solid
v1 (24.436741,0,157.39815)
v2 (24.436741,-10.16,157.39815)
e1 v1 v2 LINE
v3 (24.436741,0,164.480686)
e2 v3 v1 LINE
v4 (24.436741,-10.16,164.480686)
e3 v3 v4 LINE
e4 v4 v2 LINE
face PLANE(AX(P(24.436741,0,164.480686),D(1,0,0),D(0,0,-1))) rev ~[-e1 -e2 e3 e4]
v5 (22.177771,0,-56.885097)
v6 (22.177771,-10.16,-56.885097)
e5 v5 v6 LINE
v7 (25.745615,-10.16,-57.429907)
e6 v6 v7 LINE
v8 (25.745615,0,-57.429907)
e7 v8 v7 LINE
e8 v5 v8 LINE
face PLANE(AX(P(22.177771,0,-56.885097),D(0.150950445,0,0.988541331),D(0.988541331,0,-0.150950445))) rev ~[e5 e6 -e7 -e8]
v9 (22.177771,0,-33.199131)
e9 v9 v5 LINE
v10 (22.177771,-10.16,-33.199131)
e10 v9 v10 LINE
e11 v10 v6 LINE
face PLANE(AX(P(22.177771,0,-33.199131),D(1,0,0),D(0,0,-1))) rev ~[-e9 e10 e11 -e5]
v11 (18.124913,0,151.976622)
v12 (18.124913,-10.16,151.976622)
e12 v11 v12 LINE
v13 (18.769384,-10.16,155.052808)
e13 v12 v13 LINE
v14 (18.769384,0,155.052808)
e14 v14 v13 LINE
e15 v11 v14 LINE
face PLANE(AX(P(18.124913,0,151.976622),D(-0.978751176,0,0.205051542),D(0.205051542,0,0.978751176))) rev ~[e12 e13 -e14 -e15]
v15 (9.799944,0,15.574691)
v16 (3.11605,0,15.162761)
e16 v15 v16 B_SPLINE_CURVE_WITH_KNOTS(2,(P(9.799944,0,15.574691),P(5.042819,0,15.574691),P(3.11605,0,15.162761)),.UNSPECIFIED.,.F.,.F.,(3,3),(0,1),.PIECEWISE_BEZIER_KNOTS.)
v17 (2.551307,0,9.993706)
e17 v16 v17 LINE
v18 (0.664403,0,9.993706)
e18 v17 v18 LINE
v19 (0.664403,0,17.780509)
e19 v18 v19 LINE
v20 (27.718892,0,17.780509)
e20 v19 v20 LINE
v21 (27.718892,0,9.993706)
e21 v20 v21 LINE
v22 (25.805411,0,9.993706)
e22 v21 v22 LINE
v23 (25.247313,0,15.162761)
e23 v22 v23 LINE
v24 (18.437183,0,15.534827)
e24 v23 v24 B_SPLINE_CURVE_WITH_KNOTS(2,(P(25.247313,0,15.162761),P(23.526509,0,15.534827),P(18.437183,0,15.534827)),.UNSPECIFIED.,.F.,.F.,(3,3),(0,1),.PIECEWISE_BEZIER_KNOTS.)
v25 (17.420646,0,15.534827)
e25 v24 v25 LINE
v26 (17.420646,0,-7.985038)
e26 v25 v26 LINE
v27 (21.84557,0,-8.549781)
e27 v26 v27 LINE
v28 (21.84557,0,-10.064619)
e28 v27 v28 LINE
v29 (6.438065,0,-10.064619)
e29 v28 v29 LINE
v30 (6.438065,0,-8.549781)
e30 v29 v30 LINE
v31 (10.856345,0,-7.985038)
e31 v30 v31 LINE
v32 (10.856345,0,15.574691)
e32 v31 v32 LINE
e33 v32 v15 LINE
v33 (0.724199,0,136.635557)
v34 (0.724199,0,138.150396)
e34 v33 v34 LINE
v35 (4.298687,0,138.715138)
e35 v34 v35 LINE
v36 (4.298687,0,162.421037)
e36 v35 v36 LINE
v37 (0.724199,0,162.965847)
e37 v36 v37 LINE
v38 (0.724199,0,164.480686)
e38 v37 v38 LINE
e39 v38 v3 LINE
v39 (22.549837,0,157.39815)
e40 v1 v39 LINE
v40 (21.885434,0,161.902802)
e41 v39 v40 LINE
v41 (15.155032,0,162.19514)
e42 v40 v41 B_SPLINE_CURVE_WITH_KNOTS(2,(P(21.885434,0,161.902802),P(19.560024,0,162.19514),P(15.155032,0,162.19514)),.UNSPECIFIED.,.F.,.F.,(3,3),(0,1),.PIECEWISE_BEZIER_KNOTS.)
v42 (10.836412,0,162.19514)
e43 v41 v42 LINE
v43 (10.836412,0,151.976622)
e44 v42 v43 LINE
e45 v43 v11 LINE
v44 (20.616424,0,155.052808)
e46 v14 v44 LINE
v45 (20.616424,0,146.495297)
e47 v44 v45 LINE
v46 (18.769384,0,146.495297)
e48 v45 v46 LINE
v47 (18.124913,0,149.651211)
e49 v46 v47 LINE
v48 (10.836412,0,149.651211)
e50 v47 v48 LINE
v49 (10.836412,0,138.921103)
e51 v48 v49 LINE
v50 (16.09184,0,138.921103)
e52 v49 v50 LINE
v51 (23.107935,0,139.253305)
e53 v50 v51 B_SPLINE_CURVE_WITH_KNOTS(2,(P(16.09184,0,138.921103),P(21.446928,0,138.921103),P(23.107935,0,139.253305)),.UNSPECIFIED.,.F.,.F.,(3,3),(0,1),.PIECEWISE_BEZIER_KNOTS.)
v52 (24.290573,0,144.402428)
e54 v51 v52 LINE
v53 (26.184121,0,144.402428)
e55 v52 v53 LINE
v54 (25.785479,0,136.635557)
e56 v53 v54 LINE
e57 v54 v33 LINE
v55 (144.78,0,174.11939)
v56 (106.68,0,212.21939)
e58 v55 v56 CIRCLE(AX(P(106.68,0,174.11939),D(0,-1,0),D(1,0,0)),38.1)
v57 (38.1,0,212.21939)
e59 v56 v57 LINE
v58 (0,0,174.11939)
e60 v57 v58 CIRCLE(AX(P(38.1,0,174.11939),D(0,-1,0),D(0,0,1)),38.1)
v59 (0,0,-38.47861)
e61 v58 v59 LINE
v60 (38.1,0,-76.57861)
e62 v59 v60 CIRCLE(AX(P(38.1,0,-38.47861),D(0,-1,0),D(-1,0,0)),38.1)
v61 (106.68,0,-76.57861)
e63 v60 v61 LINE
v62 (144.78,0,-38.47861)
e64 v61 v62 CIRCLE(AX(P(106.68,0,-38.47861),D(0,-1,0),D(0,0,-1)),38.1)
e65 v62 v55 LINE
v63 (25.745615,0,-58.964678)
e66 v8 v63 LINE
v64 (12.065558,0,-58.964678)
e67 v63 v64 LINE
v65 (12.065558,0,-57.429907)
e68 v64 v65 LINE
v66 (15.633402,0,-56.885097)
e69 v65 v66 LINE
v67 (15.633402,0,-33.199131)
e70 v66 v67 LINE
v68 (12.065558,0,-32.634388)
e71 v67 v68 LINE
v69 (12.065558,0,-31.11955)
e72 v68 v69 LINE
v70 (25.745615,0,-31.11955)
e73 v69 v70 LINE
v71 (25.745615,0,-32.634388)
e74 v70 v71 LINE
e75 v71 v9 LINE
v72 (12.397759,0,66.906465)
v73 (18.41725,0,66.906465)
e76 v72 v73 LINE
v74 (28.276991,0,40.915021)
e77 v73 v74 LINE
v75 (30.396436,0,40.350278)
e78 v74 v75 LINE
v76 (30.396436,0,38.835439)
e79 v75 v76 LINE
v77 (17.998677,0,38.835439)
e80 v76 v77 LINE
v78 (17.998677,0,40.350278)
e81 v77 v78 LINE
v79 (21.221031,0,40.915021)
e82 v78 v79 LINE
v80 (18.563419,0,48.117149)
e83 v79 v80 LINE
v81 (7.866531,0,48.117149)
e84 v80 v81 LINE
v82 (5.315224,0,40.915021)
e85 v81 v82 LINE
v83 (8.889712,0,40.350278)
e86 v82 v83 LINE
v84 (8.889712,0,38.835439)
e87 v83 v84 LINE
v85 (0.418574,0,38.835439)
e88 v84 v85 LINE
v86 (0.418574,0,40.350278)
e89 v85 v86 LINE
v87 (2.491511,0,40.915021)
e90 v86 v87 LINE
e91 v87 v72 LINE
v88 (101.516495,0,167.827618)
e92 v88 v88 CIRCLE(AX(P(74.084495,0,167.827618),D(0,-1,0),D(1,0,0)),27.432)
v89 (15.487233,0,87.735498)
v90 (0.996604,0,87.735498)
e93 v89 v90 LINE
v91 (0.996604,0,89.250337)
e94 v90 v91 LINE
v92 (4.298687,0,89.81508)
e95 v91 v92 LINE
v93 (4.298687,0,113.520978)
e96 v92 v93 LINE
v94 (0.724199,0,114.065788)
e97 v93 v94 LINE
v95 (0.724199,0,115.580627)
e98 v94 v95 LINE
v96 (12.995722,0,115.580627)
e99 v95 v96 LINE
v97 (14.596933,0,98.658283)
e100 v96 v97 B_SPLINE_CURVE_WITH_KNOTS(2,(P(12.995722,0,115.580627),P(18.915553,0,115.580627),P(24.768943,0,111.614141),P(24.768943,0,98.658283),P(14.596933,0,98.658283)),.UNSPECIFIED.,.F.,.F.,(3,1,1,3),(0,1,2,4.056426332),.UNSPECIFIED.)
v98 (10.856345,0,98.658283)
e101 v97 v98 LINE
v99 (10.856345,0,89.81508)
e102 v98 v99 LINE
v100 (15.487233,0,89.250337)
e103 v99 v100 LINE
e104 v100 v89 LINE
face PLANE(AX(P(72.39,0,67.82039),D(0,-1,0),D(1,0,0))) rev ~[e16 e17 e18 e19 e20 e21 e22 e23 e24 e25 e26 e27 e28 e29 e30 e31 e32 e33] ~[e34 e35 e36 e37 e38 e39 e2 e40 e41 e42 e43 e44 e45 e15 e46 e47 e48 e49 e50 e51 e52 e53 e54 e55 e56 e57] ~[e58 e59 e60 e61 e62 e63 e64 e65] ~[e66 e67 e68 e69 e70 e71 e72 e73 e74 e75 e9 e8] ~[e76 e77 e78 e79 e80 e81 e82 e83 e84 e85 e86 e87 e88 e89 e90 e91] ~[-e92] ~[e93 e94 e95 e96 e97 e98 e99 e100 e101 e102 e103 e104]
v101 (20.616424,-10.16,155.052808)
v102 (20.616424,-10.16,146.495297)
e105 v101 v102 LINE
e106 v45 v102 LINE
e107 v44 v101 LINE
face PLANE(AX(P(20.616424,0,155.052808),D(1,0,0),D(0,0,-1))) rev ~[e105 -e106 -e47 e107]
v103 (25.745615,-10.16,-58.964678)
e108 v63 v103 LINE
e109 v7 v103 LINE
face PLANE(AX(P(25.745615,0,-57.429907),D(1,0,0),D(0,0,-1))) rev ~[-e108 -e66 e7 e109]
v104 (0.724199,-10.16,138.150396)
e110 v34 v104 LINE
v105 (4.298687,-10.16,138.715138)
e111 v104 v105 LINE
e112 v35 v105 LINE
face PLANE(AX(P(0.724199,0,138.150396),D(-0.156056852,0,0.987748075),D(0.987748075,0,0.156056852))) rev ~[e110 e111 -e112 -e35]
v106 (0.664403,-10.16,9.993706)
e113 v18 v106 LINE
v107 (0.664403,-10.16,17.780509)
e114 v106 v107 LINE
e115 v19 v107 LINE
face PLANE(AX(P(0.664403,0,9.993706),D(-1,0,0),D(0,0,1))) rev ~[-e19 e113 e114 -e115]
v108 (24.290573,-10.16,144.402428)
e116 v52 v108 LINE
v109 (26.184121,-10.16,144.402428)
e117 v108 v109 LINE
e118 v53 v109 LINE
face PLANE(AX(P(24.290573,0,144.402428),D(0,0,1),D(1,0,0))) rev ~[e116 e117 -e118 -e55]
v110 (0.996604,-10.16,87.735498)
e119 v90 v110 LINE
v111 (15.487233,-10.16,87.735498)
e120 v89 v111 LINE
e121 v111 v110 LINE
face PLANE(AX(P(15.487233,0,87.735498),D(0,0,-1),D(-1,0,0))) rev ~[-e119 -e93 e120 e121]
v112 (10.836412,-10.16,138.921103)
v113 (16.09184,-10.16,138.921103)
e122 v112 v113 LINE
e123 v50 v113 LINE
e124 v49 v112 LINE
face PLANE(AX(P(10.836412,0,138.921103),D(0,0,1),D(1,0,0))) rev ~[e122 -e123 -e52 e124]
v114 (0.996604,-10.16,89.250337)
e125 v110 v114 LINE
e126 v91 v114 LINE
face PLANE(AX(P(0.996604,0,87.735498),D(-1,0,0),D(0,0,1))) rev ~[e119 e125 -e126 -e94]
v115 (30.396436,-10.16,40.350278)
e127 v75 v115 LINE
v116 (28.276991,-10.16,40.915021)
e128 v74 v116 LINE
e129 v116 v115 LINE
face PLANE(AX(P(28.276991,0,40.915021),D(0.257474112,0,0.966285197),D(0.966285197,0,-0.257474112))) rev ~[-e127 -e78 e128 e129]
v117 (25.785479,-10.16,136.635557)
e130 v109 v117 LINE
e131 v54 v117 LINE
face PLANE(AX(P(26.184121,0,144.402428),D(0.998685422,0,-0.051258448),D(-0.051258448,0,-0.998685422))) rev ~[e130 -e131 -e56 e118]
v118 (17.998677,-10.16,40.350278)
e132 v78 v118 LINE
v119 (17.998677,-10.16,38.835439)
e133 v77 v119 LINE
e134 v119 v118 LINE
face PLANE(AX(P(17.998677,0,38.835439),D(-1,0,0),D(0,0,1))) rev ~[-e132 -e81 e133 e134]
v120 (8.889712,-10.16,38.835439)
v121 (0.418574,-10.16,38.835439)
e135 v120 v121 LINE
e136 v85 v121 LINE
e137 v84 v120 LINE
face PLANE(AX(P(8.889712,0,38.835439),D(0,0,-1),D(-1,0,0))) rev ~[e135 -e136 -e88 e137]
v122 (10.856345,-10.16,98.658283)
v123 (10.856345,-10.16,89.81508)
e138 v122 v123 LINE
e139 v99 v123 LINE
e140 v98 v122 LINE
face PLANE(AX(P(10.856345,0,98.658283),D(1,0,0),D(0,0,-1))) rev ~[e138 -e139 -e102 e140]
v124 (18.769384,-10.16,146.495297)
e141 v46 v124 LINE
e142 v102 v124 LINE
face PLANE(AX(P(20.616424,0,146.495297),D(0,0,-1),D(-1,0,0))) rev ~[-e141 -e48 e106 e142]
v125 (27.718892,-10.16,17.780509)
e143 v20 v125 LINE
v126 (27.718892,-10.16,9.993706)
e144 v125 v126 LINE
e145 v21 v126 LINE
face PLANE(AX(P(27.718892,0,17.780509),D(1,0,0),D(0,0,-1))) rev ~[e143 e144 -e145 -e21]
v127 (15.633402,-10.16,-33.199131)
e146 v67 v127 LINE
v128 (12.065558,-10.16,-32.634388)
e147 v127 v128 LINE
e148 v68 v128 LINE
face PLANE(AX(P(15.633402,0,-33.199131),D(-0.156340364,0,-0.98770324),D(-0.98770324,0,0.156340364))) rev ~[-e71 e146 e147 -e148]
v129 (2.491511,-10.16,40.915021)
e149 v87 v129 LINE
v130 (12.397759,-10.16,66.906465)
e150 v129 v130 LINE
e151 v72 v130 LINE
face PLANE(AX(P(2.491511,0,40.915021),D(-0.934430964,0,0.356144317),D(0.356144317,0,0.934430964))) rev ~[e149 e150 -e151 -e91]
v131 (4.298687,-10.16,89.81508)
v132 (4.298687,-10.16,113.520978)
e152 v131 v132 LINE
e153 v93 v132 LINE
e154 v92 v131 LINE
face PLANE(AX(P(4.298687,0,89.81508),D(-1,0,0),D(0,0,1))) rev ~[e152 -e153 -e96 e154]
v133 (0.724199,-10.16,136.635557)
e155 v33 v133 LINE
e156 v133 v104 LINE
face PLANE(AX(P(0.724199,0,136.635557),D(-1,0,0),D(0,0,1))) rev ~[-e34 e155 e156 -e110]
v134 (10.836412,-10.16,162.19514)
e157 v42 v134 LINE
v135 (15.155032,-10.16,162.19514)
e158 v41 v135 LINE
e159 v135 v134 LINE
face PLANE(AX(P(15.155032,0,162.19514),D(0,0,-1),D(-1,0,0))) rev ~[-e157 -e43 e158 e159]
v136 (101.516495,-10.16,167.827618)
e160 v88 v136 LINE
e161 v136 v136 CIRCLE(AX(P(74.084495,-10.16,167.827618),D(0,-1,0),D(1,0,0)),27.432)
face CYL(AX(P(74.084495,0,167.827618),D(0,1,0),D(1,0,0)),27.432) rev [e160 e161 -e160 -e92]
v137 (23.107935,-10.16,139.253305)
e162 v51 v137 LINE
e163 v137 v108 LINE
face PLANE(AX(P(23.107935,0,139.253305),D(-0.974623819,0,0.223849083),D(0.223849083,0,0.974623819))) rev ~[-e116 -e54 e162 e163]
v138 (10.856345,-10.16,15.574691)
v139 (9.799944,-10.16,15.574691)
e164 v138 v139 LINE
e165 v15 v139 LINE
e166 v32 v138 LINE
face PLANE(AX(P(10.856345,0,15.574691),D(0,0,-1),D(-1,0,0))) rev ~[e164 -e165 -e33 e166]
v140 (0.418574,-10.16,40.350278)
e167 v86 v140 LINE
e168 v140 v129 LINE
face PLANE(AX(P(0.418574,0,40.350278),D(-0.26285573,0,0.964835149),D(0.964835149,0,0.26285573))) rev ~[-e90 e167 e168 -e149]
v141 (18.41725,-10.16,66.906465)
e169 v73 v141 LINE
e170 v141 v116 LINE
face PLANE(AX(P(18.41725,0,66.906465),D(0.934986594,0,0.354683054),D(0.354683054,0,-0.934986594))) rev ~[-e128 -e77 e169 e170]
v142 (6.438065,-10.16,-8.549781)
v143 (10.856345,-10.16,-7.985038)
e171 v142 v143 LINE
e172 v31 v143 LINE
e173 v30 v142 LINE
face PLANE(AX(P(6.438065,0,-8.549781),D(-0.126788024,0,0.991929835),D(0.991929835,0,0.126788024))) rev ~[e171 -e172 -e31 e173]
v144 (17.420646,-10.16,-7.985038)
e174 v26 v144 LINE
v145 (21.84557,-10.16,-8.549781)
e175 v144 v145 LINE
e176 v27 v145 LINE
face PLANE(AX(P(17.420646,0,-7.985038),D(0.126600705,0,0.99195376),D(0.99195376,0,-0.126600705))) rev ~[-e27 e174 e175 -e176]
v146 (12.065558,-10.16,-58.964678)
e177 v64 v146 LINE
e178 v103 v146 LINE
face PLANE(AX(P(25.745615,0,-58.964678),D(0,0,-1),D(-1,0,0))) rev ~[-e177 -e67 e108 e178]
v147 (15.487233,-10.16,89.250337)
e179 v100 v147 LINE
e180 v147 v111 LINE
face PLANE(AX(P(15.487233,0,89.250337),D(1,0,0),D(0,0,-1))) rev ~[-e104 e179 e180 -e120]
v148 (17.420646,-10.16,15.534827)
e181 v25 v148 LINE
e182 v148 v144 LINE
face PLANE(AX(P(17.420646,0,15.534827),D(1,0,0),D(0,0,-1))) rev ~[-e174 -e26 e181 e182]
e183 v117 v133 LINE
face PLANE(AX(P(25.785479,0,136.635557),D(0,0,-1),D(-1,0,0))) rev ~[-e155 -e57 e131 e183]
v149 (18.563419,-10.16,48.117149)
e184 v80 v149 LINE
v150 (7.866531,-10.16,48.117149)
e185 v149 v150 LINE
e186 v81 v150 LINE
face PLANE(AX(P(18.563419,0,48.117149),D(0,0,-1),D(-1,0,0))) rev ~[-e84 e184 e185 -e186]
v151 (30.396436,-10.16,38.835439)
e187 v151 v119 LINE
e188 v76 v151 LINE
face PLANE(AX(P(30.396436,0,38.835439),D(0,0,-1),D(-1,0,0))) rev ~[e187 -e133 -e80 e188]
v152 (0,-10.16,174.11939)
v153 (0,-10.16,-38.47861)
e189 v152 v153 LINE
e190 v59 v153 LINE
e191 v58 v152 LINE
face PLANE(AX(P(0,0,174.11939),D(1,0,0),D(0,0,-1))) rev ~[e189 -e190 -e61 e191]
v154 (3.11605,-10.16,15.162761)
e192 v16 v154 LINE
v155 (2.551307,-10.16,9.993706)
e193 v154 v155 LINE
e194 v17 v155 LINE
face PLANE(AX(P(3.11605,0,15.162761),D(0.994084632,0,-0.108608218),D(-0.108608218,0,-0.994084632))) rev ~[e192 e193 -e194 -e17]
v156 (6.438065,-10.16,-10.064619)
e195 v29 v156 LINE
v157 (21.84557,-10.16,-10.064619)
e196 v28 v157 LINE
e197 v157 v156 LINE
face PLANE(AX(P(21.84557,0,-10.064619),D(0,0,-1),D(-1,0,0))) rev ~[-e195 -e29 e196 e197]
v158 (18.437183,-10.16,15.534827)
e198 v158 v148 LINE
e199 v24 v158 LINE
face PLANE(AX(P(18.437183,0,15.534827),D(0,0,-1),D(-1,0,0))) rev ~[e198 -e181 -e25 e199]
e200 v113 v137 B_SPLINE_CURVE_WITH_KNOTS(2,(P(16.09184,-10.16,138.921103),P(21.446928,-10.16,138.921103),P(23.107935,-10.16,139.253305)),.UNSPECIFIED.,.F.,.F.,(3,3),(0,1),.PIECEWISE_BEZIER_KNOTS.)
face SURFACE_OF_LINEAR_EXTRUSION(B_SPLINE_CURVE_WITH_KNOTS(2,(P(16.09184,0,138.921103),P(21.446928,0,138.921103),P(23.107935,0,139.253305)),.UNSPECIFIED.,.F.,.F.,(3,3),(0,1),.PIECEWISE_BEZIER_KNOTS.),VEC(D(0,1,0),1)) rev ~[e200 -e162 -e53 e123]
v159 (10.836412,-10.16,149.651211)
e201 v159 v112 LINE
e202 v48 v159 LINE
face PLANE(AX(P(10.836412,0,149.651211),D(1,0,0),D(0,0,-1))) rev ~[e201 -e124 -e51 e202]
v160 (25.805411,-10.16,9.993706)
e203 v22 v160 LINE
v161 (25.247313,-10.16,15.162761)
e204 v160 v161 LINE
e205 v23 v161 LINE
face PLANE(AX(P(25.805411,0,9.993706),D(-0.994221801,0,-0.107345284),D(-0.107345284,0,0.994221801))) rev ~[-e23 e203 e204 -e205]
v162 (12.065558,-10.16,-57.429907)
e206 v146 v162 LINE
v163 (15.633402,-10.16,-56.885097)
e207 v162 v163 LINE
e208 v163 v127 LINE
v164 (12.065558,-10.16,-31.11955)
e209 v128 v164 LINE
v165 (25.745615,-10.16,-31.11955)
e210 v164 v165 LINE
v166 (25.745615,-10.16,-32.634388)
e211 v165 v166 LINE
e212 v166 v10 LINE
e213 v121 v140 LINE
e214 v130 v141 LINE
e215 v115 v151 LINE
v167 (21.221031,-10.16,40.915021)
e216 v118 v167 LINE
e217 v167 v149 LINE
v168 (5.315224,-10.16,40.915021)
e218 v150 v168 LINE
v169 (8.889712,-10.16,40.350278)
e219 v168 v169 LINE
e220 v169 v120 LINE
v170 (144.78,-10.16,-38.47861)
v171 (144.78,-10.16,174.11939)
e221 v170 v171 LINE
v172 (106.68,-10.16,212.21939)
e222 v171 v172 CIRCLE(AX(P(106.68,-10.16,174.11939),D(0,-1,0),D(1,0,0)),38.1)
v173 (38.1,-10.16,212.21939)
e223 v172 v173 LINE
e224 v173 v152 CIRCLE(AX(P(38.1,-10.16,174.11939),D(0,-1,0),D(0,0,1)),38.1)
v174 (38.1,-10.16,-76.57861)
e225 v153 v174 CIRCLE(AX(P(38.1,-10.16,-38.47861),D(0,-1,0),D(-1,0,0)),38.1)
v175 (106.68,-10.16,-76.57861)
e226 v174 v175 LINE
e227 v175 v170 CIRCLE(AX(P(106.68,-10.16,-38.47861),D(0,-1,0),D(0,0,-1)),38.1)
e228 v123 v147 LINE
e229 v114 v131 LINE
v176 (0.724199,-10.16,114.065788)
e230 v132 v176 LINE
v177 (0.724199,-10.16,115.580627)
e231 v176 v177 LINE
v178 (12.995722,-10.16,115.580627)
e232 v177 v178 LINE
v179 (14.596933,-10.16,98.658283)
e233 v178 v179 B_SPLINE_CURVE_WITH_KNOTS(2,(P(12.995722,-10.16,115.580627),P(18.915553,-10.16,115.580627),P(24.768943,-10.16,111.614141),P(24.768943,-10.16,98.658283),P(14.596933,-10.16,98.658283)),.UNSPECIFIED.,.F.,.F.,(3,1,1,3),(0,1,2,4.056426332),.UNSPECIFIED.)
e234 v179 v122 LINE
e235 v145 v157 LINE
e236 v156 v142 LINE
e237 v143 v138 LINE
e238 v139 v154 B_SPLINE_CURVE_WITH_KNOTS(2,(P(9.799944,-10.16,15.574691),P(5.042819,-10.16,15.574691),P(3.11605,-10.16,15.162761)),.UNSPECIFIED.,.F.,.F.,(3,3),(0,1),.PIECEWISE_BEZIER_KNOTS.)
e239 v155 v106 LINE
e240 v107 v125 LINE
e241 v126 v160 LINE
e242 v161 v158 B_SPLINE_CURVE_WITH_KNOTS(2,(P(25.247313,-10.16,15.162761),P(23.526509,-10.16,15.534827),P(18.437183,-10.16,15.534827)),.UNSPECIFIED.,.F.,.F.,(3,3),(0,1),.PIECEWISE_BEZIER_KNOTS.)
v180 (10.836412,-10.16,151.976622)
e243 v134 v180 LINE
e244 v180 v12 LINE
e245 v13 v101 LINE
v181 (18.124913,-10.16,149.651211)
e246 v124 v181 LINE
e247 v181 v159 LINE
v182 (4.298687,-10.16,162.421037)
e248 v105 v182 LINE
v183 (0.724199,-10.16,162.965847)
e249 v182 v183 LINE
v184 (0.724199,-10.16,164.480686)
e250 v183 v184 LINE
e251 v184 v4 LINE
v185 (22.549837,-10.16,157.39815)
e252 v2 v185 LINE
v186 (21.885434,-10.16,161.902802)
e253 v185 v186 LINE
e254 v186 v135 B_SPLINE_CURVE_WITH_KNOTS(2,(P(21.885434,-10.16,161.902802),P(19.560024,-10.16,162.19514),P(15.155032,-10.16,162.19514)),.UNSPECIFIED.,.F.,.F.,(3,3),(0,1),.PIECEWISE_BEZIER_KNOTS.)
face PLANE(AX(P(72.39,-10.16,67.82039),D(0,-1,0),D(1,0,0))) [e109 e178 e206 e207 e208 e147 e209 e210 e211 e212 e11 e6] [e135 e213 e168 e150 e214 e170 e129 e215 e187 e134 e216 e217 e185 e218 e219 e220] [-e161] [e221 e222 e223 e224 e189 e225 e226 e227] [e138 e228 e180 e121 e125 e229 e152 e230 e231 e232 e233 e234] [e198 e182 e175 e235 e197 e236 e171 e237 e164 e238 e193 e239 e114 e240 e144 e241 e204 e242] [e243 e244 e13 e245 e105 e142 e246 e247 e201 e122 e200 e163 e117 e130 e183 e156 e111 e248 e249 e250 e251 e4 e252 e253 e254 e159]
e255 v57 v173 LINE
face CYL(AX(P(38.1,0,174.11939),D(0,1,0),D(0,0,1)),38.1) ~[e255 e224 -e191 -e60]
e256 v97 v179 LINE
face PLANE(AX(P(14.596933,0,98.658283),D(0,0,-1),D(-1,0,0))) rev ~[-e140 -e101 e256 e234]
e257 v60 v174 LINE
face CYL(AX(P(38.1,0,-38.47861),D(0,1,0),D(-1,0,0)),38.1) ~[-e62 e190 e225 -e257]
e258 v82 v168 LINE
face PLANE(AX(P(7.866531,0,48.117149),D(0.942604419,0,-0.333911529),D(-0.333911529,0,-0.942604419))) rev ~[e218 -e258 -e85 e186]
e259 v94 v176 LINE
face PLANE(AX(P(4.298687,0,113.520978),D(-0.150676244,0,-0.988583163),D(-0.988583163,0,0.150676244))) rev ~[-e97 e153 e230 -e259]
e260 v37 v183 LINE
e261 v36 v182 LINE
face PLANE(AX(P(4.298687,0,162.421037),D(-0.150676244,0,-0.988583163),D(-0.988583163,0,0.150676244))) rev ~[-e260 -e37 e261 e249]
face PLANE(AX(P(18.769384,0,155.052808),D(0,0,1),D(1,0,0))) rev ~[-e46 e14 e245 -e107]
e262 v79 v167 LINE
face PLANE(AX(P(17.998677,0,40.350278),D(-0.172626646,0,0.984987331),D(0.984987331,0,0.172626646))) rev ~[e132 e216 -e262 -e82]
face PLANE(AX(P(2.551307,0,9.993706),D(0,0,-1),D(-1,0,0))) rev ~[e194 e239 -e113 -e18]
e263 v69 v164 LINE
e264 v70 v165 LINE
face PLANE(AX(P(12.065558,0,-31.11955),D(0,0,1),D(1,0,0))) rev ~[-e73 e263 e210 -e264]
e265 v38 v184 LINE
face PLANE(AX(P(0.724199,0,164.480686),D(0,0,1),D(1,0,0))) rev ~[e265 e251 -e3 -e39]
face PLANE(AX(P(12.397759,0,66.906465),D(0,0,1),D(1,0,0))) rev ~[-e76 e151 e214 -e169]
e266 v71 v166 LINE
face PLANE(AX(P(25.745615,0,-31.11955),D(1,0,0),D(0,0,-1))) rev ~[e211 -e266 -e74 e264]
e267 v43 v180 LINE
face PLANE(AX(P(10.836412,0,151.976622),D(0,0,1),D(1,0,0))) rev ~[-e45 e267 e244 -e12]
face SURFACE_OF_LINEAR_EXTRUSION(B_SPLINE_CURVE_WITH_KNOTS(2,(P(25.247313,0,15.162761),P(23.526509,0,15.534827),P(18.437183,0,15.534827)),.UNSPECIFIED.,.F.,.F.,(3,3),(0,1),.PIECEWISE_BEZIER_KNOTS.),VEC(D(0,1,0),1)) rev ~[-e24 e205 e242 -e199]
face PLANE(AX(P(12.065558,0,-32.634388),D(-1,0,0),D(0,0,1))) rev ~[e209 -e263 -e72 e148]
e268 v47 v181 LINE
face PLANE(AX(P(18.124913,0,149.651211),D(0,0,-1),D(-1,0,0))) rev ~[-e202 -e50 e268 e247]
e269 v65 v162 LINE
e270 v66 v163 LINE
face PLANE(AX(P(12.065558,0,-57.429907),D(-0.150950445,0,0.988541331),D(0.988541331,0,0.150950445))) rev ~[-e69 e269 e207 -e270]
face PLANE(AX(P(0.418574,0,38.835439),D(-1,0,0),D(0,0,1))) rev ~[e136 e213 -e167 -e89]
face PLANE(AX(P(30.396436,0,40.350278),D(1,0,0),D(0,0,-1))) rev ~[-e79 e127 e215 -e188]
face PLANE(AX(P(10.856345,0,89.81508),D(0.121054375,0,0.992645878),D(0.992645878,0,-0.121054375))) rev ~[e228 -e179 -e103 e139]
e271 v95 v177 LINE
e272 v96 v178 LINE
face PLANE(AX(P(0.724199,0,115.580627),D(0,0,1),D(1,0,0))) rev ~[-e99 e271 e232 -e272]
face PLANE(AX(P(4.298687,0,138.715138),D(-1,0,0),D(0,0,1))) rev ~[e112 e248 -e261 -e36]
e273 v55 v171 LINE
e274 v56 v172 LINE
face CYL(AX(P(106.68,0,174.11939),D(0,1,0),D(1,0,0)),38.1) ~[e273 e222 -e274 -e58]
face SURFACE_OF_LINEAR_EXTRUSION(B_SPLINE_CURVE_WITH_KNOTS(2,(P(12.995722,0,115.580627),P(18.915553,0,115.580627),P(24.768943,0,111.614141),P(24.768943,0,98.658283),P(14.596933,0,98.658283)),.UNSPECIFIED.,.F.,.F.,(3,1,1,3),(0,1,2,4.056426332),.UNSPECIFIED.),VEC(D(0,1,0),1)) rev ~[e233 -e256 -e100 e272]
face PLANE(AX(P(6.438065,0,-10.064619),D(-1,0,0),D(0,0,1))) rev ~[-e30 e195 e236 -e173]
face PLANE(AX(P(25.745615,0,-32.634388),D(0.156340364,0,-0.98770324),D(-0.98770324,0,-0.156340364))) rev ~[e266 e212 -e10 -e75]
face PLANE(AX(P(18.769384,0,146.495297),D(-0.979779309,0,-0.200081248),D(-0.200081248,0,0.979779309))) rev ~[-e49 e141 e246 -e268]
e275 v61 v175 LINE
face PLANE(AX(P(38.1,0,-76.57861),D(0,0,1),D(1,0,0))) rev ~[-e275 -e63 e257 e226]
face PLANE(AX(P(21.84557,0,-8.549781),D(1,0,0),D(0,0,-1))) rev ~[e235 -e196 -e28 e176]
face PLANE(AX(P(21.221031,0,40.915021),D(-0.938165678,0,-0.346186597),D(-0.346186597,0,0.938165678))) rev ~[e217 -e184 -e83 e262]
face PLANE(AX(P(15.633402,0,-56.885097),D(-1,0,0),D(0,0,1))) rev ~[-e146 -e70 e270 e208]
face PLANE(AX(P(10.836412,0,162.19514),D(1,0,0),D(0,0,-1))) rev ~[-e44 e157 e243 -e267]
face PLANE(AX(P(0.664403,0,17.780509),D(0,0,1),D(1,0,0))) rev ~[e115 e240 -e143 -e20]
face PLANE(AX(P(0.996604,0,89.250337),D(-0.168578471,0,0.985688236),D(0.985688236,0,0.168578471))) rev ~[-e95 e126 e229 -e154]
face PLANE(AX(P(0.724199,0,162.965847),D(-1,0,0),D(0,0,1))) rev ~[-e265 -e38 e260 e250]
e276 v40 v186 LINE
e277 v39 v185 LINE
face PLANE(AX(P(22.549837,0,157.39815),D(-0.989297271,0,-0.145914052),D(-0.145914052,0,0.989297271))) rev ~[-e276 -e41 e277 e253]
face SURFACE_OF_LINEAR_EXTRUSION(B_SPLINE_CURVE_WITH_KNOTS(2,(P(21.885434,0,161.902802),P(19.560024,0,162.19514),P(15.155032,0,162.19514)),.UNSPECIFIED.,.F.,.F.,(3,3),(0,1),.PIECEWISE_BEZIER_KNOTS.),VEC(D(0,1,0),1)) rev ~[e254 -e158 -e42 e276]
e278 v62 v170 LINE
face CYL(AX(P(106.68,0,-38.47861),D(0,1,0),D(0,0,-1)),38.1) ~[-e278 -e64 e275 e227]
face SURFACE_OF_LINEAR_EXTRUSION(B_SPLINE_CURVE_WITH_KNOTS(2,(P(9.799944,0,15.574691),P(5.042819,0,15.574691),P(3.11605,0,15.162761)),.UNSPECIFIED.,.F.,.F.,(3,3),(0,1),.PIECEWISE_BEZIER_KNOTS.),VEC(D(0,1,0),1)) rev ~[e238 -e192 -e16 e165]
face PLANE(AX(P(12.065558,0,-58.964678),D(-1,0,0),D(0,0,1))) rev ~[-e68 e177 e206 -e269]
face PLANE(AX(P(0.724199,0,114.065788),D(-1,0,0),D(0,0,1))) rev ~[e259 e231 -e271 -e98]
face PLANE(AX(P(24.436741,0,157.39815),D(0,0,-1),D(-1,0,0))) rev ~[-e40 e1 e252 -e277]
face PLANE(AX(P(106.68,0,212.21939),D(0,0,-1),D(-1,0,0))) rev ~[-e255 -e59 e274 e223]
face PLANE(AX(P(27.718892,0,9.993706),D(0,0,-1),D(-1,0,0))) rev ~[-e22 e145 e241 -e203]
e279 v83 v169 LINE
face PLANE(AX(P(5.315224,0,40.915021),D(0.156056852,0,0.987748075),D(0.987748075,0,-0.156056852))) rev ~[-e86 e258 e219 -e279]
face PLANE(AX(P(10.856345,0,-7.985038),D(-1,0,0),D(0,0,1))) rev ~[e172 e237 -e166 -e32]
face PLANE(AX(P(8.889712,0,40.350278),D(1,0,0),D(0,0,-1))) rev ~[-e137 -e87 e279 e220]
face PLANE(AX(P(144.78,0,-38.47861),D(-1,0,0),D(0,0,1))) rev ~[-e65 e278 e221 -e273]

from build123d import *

# Parameters (mm, degrees)
F0_R     = 27.432
F1_DEPTH = 10.16


with BuildPart() as f1:
    # F0 (on Front) → F1 (new body)
    with BuildSketch(Plane.XZ):
        with BuildLine():
            ThreePointArc((0, -38.4786100226), (11.1592316368, -65.4193783858), (38.1, -76.5786100226))
            Line((38.1, -76.5786100226), (106.68, -76.5786100226))
            ThreePointArc((106.68, -76.5786100226), (133.6207683632, -65.4193783858), (144.78, -38.4786100226))
            Line((144.78, -38.4786100226), (144.78, 174.1193899774))
            ThreePointArc((144.78, 174.1193899774), (133.6207683632, 201.0601583406), (106.68, 212.2193899774))
            Line((106.68, 212.2193899774), (38.1, 212.2193899774))
            ThreePointArc((38.1, 212.2193899774), (11.1592316368, 201.0601583406), (0, 174.1193899774))
            Line((0, 174.1193899774), (0, -38.4786100226))
        make_face()
        Polygon((22.1777712578, -33.1991309873), (22.1777712578, -56.8850969951), (25.7456152258, -57.4299074334), (25.7456152258, -58.9646783023), (12.065558, -58.9646783023), (12.065558, -57.4299074334), (15.6334019681, -56.8850969951), (15.6334019681, -33.1991309873), (12.065558, -32.6343884598), (12.065558, -31.11954968), (25.7456152258, -31.11954968), (25.7456152258, -32.6343884598), align=None, mode=Mode.SUBTRACT)
        with BuildLine():
            Line((21.845569771, -10.0646194476), (6.4380648139, -10.0646194476))
            Line((6.4380648139, -10.0646194476), (6.4380648139, -8.5497806678))
            Line((6.4380648139, -8.5497806678), (10.8563445881, -7.9850381403))
            Line((10.8563445881, -7.9850381403), (10.8563445881, 15.5746913025))
            Line((10.8563445881, 15.5746913025), (9.7999438602, 15.5746913025))
            add(Edge.make_bspline(
                [(9.7999438602, 15.5746913025), (5.0428185694, 15.5746913025), (3.116049946, 15.1627614589)],
                knots=[0, 0, 0, 1, 1, 1], degree=2))
            Line((3.116049946, 15.1627614589), (2.5513074185, 9.9937063245))
            Line((2.5513074185, 9.9937063245), (0.6644029736, 9.9937063245))
            Line((0.6644029736, 9.9937063245), (0.6644029736, 17.7805091747))
            Line((0.6644029736, 17.7805091747), (27.7188920573, 17.7805091747))
            Line((27.7188920573, 17.7805091747), (27.7188920573, 9.9937063245))
            Line((27.7188920573, 9.9937063245), (25.8054114935, 9.9937063245))
            Line((25.8054114935, 9.9937063245), (25.2473129957, 15.1627614589))
            add(Edge.make_bspline(
                [(25.2473129957, 15.1627614589), (23.5265092941, 15.5348271241), (18.4371825166, 15.5348271241)],
                knots=[0, 0, 0, 1, 1, 1], degree=2))
            Line((18.4371825166, 15.5348271241), (17.420645967, 15.5348271241))
            Line((17.420645967, 15.5348271241), (17.420645967, -7.9850381403))
            Line((17.420645967, -7.9850381403), (21.845569771, -8.5497806678))
            Line((21.845569771, -8.5497806678), (21.845569771, -10.0646194476))
        make_face(mode=Mode.SUBTRACT)
        Polygon((5.3152237886, 40.9150207144), (8.8897117864, 40.3502781869), (8.8897117864, 38.8354394072), (0.4185738733, 38.8354394072), (0.4185738733, 40.3502781869), (2.4915111509, 40.9150207144), (12.3977594868, 66.9064650405), (18.4172504274, 66.9064650405), (28.2769905551, 40.9150207144), (30.3964360408, 40.3502781869), (30.3964360408, 38.8354394072), (17.998676554, 38.8354394072), (17.998676554, 40.3502781869), (21.2210309758, 40.9150207144), (18.5634190815, 48.1171489479), (7.8665312071, 48.1171489479), align=None, mode=Mode.SUBTRACT)
        with BuildLine():
            Line((14.5969333293, 98.6582831474), (10.8563445881, 98.6582831474))
            Line((10.8563445881, 98.6582831474), (10.8563445881, 89.8150795692))
            Line((10.8563445881, 89.8150795692), (15.4872333139, 89.2503370416))
            Line((15.4872333139, 89.2503370416), (15.4872333139, 87.7354982619))
            Line((15.4872333139, 87.7354982619), (0.9966044604, 87.7354982619))
            Line((0.9966044604, 87.7354982619), (0.9966044604, 89.2503370416))
            Line((0.9966044604, 89.2503370416), (4.298687239, 89.8150795692))
            Line((4.298687239, 89.8150795692), (4.298687239, 113.5209776661))
            Line((4.298687239, 113.5209776661), (0.7241992412, 114.0657881045))
            Line((0.7241992412, 114.0657881045), (0.7241992412, 115.5806268842))
            Line((0.7241992412, 115.5806268842), (12.995722163, 115.5806268842))
            add(Edge.make_bspline(
                [(12.995722163, 115.5806268842), (18.9155526575, 115.5806268842), (21.8422477561, 113.5973840081)],
                knots=[0, 0, 0, 1, 1, 1], degree=2))
            add(Edge.make_bspline(
                [(21.8422477561, 113.5973840081), (24.7689428547, 111.614141132), (24.7689428547, 107.3752501606)],
                knots=[0, 0, 0, 1, 1, 1], degree=2))
            add(Edge.make_bspline(
                [(24.7689428547, 107.3752501606), (24.7689428547, 98.6582831474), (14.5969333293, 98.6582831474)],
                knots=[0, 0, 0, 1, 1, 1], degree=2))
        make_face(mode=Mode.SUBTRACT)
        with BuildLine():
            Line((0.7241992412, 136.6355571166), (0.7241992412, 138.1503958964))
            Line((0.7241992412, 138.1503958964), (4.298687239, 138.7151384239))
            Line((4.298687239, 138.7151384239), (4.298687239, 162.4210365209))
            Line((4.298687239, 162.4210365209), (0.7241992412, 162.9658469592))
            Line((0.7241992412, 162.9658469592), (0.7241992412, 164.4806857389))
            Line((0.7241992412, 164.4806857389), (24.4367413679, 164.4806857389))
            Line((24.4367413679, 164.4806857389), (24.4367413679, 157.3981500407))
            Line((24.4367413679, 157.3981500407), (22.549836923, 157.3981500407))
            Line((22.549836923, 157.3981500407), (21.8854339494, 161.9028022015))
            add(Edge.make_bspline(
                [(21.8854339494, 161.9028022015), (19.5600235419, 162.1951395099), (15.1550318271, 162.1951395099)],
                knots=[0, 0, 0, 1, 1, 1], degree=2))
            Line((15.1550318271, 162.1951395099), (10.8364124989, 162.1951395099))
            Line((10.8364124989, 162.1951395099), (10.8364124989, 151.9766217764))
            Line((10.8364124989, 151.9766217764), (18.124913119, 151.9766217764))
            Line((18.124913119, 151.9766217764), (18.7693840033, 155.052807544))
            Line((18.7693840033, 155.052807544), (20.6164242699, 155.052807544))
            Line((20.6164242699, 155.052807544), (20.6164242699, 146.4952972444))
            Line((20.6164242699, 146.4952972444), (18.7693840033, 146.4952972444))
            Line((18.7693840033, 146.4952972444), (18.124913119, 149.6512113689))
            Line((18.124913119, 149.6512113689), (10.8364124989, 149.6512113689))
            Line((10.8364124989, 149.6512113689), (10.8364124989, 138.9211033457))
            Line((10.8364124989, 138.9211033457), (16.0918400199, 138.9211033457))
            add(Edge.make_bspline(
                [(16.0918400199, 138.9211033457), (21.4469279868, 138.9211033457), (23.1079354208, 139.2533048325)],
                knots=[0, 0, 0, 1, 1, 1], degree=2))
            Line((23.1079354208, 139.2533048325), (24.2905727137, 144.4024278777))
            Line((24.2905727137, 144.4024278777), (26.1841211884, 144.4024278777))
            Line((26.1841211884, 144.4024278777), (25.7854794042, 136.6355571166))
            Line((25.7854794042, 136.6355571166), (0.7241992412, 136.6355571166))
        make_face(mode=Mode.SUBTRACT)
        with Locations((74.0844953617, 167.8276180772)):
            Circle(F0_R, mode=Mode.SUBTRACT)
    extrude(amount=F1_DEPTH)


solid = f1.part
